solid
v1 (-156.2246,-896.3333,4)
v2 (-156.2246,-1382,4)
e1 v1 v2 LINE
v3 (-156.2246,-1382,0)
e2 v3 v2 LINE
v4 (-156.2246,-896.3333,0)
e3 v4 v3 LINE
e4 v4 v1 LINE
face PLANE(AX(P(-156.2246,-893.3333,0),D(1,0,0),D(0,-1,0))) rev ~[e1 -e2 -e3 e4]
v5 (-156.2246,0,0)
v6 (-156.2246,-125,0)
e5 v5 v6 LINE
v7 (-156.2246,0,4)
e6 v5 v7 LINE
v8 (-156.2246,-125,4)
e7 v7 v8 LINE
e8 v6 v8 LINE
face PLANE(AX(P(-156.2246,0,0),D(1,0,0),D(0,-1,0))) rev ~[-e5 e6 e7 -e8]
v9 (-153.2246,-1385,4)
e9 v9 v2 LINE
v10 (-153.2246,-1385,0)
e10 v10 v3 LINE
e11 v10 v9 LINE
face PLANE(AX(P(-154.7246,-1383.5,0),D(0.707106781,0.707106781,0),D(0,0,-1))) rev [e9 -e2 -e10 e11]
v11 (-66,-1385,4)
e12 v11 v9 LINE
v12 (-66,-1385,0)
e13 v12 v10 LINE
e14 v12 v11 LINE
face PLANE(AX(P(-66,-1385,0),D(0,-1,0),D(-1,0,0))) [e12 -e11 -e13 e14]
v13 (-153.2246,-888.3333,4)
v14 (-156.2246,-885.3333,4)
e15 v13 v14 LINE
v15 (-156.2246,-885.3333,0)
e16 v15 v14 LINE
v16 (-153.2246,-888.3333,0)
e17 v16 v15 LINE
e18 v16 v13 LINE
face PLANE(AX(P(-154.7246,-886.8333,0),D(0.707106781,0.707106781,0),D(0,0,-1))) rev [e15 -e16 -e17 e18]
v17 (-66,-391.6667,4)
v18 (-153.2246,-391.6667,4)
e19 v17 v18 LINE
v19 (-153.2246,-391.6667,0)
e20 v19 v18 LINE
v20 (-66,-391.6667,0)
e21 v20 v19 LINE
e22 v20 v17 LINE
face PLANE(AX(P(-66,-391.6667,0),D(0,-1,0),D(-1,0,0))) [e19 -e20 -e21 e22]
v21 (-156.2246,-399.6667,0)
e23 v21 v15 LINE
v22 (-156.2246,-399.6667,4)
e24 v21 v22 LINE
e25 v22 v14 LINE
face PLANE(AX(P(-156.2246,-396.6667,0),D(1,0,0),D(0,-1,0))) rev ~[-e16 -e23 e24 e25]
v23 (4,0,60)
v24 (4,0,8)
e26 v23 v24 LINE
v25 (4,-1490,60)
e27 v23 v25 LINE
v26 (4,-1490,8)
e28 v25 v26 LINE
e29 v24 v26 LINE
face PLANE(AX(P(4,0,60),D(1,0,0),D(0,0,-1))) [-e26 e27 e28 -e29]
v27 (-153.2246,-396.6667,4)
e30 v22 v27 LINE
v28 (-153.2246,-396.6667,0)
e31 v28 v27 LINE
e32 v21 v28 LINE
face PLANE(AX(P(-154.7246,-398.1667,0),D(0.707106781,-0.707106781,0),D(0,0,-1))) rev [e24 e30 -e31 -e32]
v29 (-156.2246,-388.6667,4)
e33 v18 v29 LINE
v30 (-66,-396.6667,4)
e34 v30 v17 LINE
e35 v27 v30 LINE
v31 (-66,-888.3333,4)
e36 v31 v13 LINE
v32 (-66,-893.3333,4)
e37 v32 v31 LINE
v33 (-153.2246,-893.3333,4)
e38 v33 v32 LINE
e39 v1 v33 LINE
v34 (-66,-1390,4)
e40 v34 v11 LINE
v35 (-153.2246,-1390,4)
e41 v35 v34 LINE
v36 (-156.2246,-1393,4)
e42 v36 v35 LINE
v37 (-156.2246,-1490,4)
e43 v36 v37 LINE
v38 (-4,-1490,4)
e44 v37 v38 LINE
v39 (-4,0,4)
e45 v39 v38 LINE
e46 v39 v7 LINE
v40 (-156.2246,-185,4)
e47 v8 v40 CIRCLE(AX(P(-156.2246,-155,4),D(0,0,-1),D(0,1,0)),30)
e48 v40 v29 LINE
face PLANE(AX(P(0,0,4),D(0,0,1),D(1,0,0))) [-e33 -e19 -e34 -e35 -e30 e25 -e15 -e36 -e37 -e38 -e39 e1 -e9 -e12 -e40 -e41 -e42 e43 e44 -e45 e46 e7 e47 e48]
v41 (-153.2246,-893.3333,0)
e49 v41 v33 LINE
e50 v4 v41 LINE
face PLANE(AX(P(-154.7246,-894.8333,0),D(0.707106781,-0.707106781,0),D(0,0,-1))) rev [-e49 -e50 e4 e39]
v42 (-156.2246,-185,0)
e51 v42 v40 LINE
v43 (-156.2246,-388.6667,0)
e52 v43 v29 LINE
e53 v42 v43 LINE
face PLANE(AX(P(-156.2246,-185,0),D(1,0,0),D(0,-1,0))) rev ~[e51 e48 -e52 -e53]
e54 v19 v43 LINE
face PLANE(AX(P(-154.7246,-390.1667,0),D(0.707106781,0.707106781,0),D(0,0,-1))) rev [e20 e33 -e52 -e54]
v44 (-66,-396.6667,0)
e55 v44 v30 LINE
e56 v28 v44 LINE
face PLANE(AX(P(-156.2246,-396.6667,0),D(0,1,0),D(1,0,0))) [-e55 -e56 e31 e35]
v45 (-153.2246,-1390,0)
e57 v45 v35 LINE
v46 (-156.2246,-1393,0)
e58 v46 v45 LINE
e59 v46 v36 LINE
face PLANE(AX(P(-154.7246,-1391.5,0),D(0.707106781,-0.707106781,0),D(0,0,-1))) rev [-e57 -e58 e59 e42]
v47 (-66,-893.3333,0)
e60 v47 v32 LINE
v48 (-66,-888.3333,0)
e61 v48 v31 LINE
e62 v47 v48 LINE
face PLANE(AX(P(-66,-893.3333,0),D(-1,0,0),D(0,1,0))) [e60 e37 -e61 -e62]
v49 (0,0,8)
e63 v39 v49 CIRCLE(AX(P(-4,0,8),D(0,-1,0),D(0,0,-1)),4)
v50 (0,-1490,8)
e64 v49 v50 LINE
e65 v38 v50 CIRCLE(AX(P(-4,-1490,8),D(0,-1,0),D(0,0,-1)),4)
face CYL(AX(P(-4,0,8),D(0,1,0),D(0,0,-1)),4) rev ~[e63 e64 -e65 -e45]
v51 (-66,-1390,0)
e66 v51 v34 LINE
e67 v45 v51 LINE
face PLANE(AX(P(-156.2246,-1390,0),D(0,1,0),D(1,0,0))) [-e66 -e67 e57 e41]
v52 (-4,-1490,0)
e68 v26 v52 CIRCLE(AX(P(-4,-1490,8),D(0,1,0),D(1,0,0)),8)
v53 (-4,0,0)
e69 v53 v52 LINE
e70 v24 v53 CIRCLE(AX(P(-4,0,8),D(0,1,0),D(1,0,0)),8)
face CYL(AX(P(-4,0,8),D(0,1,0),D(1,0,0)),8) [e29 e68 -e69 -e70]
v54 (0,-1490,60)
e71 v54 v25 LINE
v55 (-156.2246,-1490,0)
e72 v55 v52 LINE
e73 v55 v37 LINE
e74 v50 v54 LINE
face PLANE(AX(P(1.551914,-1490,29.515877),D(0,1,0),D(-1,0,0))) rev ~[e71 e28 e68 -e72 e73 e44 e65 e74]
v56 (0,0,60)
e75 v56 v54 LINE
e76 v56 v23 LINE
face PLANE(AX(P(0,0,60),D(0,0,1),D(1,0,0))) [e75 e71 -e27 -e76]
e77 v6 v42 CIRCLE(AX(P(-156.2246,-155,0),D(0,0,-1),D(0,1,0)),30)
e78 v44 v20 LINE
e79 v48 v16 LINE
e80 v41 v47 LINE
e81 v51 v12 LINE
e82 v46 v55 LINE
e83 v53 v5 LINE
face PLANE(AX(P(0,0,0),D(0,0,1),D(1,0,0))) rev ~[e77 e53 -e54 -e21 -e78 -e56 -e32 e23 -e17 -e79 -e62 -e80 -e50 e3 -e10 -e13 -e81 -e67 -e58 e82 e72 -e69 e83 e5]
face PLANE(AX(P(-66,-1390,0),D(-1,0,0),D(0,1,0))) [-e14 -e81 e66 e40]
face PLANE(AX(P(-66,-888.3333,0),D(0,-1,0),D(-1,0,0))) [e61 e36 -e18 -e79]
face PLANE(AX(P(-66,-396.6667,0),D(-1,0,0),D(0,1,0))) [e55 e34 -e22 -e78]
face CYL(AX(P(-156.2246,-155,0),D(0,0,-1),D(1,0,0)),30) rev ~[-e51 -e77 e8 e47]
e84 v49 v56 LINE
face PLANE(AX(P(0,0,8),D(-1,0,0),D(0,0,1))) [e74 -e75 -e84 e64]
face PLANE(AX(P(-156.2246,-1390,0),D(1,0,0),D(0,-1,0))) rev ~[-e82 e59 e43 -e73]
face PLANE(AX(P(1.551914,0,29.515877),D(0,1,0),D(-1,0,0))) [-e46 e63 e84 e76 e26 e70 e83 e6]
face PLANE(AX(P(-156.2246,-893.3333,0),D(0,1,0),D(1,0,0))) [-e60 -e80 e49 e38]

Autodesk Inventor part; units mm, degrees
ref_plane "YZ Plane" through (0, 0, 0) normal (1, 0, 0) x (0, 1, 0)
ref_plane "XZ Plane" through (0, 0, 0) normal (0, 1, 0) x (-1, 0, 0)
ref_plane "XY Plane" through (0, 0, 0) normal (0, 0, 1) x (1, 0, 0)
sketch "Sketch1" plane through (0, 0, 0) normal (0, 0, 1) x (1, 0, 0)
  line L0 (0, 0) -> (-156.2246, 0)
  line L1 (-156.2246, 0) -> (-156.2246, -1490)
  line L2 (-156.2246, -1490) -> (0, -1490)
  line L3 (0, -1490) -> (0, 0)
  line L4 (-156.2246, -1390) -> (-66, -1390)
  line L5 (-66, -1390) -> (-66, -1385)
  line L6 (-66, -1385) -> (-156.2246, -1385)
  line L7 (-156.2246, -1385) -> (-156.2246, -1390)
  line L8 (-156.2246, -893.3333) -> (-66, -893.3333)
  line L9 (-66, -893.3333) -> (-66, -888.3333)
  line L10 (-66, -888.3333) -> (-156.2246, -888.3333)
  line L11 (-156.2246, -888.3333) -> (-156.2246, -893.3333)
  line L12 (-156.2246, -396.6667) -> (-66, -396.6667)
  line L13 (-66, -396.6667) -> (-66, -391.6667)
  line L14 (-66, -391.6667) -> (-156.2246, -391.6667)
  line L15 (-156.2246, -391.6667) -> (-156.2246, -396.6667)
  circle A0 centre (-156.2246, -155) radius 30
  point P0 (-156.2246, -391.6667)
  point P1 (-156.2246, -125)
  point P2 (-156.2246, -185)
  dimension "d0" = 1490
  dimension "d1" = 156.2246
  dimension "d2" = 5
  dimension "d4" = 100
  dimension "d7" = 496.6667
  dimension "d23" = 66
  dimension "d28" = 60
  dimension "d29" = 1335
extrude "Plate1" add sketch "Sketch1" along normal blind 4 contours L3 L2 L1 L4 L5 L6 L8 L9 L10 L12 L13 L14 A0 L0
sketch "Sketch2" plane through (4, 0, 0) normal (-1, 0, 0) x (0, -1, 0)
  line L0 (1490, 0) -> (0, 0)
  line L1 (0, 0) -> (0, 60)
  line L2 (0, 60) -> (1490, 60)
  line L3 (1490, 60) -> (1490, 0)
edge flange "Flange1" height 60 angle 90 thickness 4 bend radius 4 thickness toward (-1, 0, 0) relief tear relief width 4 relief depth 2 edges at (0, -745, 4) wall of the first edge with corners at (4, -1490, 0) (4, 0, 0) (4, 0, 60) (4, -1490, 60)
bend "Bend1"
corner "Corner1"
chamfer "Corner Chamfer1" distance 3 angle 45 6 edges at (-156.2246, -1390, 2) (-156.2246, -1385, 2) (-156.2246, -893.3333, 2) (-156.2246, -888.3333, 2) (-156.2246, -391.6667, 2) (-156.2246, -396.6667, 2)
equation "\"d0\" = Стрингер_длина"
equation "\"d1\" = стрингер_глубина_4"
equation "\"d2\" = паз_под_стрингер_толщина"
equation "\"d7\" = Шаг_шпангоутов"
equation "\"d23\" = паз_под_стрингер_глубина - Thickness"
equation "\"d28\" = 2 * радиус_выреза_под_сварку"
equation "\"d12\" = Thickness"
equation "\"d13\" = BendReliefWidth"
equation "\"d14\" = BendReliefDepth"
equation "\"d15\" = MinimumRemnant"
equation "\"d16\" = TransitionRadius"
equation "\"d17\" = ребро_усилителей"
equation "\"d19\" = BendRadius"
equation "\"d20\" = CornerReliefSize"
equation "\"d21\" = GapSize"
equation "\"d22\" = JacobiRadiusSize"
equation "\"BendRadius\" = Thickness"
equation "\"BendReliefWidth\" = Thickness"
equation "\"BendReliefDepth\" = 0.5 * Thickness"
equation "\"CornerReliefSize\" = 4 * Thickness"
equation "\"MinimumRemnant\" = 2 * Thickness"
equation "\"TransitionRadius\" = BendRadius"
equation "\"JacobiRadiusSize\" = BendRadius"
equation "\"GapSize\" = Thickness"
equation "\"Стрингер_длина\" = 1490"
equation "\"стрингер_глубина_4\" = 156.224572"
equation "\"паз_под_стрингер_толщина\" = 5"
equation "\"Шаг_шпангоутов\" = 496.666667"
equation "\"паз_под_стрингер_глубина\" = 70"
equation "\"Thickness\" = 4"
equation "\"радиус_выреза_под_сварку\" = 30"
equation "\"ребро_усилителей\" = 60"
properties part number "GBK 1212 stringer 4" material "Steel"
